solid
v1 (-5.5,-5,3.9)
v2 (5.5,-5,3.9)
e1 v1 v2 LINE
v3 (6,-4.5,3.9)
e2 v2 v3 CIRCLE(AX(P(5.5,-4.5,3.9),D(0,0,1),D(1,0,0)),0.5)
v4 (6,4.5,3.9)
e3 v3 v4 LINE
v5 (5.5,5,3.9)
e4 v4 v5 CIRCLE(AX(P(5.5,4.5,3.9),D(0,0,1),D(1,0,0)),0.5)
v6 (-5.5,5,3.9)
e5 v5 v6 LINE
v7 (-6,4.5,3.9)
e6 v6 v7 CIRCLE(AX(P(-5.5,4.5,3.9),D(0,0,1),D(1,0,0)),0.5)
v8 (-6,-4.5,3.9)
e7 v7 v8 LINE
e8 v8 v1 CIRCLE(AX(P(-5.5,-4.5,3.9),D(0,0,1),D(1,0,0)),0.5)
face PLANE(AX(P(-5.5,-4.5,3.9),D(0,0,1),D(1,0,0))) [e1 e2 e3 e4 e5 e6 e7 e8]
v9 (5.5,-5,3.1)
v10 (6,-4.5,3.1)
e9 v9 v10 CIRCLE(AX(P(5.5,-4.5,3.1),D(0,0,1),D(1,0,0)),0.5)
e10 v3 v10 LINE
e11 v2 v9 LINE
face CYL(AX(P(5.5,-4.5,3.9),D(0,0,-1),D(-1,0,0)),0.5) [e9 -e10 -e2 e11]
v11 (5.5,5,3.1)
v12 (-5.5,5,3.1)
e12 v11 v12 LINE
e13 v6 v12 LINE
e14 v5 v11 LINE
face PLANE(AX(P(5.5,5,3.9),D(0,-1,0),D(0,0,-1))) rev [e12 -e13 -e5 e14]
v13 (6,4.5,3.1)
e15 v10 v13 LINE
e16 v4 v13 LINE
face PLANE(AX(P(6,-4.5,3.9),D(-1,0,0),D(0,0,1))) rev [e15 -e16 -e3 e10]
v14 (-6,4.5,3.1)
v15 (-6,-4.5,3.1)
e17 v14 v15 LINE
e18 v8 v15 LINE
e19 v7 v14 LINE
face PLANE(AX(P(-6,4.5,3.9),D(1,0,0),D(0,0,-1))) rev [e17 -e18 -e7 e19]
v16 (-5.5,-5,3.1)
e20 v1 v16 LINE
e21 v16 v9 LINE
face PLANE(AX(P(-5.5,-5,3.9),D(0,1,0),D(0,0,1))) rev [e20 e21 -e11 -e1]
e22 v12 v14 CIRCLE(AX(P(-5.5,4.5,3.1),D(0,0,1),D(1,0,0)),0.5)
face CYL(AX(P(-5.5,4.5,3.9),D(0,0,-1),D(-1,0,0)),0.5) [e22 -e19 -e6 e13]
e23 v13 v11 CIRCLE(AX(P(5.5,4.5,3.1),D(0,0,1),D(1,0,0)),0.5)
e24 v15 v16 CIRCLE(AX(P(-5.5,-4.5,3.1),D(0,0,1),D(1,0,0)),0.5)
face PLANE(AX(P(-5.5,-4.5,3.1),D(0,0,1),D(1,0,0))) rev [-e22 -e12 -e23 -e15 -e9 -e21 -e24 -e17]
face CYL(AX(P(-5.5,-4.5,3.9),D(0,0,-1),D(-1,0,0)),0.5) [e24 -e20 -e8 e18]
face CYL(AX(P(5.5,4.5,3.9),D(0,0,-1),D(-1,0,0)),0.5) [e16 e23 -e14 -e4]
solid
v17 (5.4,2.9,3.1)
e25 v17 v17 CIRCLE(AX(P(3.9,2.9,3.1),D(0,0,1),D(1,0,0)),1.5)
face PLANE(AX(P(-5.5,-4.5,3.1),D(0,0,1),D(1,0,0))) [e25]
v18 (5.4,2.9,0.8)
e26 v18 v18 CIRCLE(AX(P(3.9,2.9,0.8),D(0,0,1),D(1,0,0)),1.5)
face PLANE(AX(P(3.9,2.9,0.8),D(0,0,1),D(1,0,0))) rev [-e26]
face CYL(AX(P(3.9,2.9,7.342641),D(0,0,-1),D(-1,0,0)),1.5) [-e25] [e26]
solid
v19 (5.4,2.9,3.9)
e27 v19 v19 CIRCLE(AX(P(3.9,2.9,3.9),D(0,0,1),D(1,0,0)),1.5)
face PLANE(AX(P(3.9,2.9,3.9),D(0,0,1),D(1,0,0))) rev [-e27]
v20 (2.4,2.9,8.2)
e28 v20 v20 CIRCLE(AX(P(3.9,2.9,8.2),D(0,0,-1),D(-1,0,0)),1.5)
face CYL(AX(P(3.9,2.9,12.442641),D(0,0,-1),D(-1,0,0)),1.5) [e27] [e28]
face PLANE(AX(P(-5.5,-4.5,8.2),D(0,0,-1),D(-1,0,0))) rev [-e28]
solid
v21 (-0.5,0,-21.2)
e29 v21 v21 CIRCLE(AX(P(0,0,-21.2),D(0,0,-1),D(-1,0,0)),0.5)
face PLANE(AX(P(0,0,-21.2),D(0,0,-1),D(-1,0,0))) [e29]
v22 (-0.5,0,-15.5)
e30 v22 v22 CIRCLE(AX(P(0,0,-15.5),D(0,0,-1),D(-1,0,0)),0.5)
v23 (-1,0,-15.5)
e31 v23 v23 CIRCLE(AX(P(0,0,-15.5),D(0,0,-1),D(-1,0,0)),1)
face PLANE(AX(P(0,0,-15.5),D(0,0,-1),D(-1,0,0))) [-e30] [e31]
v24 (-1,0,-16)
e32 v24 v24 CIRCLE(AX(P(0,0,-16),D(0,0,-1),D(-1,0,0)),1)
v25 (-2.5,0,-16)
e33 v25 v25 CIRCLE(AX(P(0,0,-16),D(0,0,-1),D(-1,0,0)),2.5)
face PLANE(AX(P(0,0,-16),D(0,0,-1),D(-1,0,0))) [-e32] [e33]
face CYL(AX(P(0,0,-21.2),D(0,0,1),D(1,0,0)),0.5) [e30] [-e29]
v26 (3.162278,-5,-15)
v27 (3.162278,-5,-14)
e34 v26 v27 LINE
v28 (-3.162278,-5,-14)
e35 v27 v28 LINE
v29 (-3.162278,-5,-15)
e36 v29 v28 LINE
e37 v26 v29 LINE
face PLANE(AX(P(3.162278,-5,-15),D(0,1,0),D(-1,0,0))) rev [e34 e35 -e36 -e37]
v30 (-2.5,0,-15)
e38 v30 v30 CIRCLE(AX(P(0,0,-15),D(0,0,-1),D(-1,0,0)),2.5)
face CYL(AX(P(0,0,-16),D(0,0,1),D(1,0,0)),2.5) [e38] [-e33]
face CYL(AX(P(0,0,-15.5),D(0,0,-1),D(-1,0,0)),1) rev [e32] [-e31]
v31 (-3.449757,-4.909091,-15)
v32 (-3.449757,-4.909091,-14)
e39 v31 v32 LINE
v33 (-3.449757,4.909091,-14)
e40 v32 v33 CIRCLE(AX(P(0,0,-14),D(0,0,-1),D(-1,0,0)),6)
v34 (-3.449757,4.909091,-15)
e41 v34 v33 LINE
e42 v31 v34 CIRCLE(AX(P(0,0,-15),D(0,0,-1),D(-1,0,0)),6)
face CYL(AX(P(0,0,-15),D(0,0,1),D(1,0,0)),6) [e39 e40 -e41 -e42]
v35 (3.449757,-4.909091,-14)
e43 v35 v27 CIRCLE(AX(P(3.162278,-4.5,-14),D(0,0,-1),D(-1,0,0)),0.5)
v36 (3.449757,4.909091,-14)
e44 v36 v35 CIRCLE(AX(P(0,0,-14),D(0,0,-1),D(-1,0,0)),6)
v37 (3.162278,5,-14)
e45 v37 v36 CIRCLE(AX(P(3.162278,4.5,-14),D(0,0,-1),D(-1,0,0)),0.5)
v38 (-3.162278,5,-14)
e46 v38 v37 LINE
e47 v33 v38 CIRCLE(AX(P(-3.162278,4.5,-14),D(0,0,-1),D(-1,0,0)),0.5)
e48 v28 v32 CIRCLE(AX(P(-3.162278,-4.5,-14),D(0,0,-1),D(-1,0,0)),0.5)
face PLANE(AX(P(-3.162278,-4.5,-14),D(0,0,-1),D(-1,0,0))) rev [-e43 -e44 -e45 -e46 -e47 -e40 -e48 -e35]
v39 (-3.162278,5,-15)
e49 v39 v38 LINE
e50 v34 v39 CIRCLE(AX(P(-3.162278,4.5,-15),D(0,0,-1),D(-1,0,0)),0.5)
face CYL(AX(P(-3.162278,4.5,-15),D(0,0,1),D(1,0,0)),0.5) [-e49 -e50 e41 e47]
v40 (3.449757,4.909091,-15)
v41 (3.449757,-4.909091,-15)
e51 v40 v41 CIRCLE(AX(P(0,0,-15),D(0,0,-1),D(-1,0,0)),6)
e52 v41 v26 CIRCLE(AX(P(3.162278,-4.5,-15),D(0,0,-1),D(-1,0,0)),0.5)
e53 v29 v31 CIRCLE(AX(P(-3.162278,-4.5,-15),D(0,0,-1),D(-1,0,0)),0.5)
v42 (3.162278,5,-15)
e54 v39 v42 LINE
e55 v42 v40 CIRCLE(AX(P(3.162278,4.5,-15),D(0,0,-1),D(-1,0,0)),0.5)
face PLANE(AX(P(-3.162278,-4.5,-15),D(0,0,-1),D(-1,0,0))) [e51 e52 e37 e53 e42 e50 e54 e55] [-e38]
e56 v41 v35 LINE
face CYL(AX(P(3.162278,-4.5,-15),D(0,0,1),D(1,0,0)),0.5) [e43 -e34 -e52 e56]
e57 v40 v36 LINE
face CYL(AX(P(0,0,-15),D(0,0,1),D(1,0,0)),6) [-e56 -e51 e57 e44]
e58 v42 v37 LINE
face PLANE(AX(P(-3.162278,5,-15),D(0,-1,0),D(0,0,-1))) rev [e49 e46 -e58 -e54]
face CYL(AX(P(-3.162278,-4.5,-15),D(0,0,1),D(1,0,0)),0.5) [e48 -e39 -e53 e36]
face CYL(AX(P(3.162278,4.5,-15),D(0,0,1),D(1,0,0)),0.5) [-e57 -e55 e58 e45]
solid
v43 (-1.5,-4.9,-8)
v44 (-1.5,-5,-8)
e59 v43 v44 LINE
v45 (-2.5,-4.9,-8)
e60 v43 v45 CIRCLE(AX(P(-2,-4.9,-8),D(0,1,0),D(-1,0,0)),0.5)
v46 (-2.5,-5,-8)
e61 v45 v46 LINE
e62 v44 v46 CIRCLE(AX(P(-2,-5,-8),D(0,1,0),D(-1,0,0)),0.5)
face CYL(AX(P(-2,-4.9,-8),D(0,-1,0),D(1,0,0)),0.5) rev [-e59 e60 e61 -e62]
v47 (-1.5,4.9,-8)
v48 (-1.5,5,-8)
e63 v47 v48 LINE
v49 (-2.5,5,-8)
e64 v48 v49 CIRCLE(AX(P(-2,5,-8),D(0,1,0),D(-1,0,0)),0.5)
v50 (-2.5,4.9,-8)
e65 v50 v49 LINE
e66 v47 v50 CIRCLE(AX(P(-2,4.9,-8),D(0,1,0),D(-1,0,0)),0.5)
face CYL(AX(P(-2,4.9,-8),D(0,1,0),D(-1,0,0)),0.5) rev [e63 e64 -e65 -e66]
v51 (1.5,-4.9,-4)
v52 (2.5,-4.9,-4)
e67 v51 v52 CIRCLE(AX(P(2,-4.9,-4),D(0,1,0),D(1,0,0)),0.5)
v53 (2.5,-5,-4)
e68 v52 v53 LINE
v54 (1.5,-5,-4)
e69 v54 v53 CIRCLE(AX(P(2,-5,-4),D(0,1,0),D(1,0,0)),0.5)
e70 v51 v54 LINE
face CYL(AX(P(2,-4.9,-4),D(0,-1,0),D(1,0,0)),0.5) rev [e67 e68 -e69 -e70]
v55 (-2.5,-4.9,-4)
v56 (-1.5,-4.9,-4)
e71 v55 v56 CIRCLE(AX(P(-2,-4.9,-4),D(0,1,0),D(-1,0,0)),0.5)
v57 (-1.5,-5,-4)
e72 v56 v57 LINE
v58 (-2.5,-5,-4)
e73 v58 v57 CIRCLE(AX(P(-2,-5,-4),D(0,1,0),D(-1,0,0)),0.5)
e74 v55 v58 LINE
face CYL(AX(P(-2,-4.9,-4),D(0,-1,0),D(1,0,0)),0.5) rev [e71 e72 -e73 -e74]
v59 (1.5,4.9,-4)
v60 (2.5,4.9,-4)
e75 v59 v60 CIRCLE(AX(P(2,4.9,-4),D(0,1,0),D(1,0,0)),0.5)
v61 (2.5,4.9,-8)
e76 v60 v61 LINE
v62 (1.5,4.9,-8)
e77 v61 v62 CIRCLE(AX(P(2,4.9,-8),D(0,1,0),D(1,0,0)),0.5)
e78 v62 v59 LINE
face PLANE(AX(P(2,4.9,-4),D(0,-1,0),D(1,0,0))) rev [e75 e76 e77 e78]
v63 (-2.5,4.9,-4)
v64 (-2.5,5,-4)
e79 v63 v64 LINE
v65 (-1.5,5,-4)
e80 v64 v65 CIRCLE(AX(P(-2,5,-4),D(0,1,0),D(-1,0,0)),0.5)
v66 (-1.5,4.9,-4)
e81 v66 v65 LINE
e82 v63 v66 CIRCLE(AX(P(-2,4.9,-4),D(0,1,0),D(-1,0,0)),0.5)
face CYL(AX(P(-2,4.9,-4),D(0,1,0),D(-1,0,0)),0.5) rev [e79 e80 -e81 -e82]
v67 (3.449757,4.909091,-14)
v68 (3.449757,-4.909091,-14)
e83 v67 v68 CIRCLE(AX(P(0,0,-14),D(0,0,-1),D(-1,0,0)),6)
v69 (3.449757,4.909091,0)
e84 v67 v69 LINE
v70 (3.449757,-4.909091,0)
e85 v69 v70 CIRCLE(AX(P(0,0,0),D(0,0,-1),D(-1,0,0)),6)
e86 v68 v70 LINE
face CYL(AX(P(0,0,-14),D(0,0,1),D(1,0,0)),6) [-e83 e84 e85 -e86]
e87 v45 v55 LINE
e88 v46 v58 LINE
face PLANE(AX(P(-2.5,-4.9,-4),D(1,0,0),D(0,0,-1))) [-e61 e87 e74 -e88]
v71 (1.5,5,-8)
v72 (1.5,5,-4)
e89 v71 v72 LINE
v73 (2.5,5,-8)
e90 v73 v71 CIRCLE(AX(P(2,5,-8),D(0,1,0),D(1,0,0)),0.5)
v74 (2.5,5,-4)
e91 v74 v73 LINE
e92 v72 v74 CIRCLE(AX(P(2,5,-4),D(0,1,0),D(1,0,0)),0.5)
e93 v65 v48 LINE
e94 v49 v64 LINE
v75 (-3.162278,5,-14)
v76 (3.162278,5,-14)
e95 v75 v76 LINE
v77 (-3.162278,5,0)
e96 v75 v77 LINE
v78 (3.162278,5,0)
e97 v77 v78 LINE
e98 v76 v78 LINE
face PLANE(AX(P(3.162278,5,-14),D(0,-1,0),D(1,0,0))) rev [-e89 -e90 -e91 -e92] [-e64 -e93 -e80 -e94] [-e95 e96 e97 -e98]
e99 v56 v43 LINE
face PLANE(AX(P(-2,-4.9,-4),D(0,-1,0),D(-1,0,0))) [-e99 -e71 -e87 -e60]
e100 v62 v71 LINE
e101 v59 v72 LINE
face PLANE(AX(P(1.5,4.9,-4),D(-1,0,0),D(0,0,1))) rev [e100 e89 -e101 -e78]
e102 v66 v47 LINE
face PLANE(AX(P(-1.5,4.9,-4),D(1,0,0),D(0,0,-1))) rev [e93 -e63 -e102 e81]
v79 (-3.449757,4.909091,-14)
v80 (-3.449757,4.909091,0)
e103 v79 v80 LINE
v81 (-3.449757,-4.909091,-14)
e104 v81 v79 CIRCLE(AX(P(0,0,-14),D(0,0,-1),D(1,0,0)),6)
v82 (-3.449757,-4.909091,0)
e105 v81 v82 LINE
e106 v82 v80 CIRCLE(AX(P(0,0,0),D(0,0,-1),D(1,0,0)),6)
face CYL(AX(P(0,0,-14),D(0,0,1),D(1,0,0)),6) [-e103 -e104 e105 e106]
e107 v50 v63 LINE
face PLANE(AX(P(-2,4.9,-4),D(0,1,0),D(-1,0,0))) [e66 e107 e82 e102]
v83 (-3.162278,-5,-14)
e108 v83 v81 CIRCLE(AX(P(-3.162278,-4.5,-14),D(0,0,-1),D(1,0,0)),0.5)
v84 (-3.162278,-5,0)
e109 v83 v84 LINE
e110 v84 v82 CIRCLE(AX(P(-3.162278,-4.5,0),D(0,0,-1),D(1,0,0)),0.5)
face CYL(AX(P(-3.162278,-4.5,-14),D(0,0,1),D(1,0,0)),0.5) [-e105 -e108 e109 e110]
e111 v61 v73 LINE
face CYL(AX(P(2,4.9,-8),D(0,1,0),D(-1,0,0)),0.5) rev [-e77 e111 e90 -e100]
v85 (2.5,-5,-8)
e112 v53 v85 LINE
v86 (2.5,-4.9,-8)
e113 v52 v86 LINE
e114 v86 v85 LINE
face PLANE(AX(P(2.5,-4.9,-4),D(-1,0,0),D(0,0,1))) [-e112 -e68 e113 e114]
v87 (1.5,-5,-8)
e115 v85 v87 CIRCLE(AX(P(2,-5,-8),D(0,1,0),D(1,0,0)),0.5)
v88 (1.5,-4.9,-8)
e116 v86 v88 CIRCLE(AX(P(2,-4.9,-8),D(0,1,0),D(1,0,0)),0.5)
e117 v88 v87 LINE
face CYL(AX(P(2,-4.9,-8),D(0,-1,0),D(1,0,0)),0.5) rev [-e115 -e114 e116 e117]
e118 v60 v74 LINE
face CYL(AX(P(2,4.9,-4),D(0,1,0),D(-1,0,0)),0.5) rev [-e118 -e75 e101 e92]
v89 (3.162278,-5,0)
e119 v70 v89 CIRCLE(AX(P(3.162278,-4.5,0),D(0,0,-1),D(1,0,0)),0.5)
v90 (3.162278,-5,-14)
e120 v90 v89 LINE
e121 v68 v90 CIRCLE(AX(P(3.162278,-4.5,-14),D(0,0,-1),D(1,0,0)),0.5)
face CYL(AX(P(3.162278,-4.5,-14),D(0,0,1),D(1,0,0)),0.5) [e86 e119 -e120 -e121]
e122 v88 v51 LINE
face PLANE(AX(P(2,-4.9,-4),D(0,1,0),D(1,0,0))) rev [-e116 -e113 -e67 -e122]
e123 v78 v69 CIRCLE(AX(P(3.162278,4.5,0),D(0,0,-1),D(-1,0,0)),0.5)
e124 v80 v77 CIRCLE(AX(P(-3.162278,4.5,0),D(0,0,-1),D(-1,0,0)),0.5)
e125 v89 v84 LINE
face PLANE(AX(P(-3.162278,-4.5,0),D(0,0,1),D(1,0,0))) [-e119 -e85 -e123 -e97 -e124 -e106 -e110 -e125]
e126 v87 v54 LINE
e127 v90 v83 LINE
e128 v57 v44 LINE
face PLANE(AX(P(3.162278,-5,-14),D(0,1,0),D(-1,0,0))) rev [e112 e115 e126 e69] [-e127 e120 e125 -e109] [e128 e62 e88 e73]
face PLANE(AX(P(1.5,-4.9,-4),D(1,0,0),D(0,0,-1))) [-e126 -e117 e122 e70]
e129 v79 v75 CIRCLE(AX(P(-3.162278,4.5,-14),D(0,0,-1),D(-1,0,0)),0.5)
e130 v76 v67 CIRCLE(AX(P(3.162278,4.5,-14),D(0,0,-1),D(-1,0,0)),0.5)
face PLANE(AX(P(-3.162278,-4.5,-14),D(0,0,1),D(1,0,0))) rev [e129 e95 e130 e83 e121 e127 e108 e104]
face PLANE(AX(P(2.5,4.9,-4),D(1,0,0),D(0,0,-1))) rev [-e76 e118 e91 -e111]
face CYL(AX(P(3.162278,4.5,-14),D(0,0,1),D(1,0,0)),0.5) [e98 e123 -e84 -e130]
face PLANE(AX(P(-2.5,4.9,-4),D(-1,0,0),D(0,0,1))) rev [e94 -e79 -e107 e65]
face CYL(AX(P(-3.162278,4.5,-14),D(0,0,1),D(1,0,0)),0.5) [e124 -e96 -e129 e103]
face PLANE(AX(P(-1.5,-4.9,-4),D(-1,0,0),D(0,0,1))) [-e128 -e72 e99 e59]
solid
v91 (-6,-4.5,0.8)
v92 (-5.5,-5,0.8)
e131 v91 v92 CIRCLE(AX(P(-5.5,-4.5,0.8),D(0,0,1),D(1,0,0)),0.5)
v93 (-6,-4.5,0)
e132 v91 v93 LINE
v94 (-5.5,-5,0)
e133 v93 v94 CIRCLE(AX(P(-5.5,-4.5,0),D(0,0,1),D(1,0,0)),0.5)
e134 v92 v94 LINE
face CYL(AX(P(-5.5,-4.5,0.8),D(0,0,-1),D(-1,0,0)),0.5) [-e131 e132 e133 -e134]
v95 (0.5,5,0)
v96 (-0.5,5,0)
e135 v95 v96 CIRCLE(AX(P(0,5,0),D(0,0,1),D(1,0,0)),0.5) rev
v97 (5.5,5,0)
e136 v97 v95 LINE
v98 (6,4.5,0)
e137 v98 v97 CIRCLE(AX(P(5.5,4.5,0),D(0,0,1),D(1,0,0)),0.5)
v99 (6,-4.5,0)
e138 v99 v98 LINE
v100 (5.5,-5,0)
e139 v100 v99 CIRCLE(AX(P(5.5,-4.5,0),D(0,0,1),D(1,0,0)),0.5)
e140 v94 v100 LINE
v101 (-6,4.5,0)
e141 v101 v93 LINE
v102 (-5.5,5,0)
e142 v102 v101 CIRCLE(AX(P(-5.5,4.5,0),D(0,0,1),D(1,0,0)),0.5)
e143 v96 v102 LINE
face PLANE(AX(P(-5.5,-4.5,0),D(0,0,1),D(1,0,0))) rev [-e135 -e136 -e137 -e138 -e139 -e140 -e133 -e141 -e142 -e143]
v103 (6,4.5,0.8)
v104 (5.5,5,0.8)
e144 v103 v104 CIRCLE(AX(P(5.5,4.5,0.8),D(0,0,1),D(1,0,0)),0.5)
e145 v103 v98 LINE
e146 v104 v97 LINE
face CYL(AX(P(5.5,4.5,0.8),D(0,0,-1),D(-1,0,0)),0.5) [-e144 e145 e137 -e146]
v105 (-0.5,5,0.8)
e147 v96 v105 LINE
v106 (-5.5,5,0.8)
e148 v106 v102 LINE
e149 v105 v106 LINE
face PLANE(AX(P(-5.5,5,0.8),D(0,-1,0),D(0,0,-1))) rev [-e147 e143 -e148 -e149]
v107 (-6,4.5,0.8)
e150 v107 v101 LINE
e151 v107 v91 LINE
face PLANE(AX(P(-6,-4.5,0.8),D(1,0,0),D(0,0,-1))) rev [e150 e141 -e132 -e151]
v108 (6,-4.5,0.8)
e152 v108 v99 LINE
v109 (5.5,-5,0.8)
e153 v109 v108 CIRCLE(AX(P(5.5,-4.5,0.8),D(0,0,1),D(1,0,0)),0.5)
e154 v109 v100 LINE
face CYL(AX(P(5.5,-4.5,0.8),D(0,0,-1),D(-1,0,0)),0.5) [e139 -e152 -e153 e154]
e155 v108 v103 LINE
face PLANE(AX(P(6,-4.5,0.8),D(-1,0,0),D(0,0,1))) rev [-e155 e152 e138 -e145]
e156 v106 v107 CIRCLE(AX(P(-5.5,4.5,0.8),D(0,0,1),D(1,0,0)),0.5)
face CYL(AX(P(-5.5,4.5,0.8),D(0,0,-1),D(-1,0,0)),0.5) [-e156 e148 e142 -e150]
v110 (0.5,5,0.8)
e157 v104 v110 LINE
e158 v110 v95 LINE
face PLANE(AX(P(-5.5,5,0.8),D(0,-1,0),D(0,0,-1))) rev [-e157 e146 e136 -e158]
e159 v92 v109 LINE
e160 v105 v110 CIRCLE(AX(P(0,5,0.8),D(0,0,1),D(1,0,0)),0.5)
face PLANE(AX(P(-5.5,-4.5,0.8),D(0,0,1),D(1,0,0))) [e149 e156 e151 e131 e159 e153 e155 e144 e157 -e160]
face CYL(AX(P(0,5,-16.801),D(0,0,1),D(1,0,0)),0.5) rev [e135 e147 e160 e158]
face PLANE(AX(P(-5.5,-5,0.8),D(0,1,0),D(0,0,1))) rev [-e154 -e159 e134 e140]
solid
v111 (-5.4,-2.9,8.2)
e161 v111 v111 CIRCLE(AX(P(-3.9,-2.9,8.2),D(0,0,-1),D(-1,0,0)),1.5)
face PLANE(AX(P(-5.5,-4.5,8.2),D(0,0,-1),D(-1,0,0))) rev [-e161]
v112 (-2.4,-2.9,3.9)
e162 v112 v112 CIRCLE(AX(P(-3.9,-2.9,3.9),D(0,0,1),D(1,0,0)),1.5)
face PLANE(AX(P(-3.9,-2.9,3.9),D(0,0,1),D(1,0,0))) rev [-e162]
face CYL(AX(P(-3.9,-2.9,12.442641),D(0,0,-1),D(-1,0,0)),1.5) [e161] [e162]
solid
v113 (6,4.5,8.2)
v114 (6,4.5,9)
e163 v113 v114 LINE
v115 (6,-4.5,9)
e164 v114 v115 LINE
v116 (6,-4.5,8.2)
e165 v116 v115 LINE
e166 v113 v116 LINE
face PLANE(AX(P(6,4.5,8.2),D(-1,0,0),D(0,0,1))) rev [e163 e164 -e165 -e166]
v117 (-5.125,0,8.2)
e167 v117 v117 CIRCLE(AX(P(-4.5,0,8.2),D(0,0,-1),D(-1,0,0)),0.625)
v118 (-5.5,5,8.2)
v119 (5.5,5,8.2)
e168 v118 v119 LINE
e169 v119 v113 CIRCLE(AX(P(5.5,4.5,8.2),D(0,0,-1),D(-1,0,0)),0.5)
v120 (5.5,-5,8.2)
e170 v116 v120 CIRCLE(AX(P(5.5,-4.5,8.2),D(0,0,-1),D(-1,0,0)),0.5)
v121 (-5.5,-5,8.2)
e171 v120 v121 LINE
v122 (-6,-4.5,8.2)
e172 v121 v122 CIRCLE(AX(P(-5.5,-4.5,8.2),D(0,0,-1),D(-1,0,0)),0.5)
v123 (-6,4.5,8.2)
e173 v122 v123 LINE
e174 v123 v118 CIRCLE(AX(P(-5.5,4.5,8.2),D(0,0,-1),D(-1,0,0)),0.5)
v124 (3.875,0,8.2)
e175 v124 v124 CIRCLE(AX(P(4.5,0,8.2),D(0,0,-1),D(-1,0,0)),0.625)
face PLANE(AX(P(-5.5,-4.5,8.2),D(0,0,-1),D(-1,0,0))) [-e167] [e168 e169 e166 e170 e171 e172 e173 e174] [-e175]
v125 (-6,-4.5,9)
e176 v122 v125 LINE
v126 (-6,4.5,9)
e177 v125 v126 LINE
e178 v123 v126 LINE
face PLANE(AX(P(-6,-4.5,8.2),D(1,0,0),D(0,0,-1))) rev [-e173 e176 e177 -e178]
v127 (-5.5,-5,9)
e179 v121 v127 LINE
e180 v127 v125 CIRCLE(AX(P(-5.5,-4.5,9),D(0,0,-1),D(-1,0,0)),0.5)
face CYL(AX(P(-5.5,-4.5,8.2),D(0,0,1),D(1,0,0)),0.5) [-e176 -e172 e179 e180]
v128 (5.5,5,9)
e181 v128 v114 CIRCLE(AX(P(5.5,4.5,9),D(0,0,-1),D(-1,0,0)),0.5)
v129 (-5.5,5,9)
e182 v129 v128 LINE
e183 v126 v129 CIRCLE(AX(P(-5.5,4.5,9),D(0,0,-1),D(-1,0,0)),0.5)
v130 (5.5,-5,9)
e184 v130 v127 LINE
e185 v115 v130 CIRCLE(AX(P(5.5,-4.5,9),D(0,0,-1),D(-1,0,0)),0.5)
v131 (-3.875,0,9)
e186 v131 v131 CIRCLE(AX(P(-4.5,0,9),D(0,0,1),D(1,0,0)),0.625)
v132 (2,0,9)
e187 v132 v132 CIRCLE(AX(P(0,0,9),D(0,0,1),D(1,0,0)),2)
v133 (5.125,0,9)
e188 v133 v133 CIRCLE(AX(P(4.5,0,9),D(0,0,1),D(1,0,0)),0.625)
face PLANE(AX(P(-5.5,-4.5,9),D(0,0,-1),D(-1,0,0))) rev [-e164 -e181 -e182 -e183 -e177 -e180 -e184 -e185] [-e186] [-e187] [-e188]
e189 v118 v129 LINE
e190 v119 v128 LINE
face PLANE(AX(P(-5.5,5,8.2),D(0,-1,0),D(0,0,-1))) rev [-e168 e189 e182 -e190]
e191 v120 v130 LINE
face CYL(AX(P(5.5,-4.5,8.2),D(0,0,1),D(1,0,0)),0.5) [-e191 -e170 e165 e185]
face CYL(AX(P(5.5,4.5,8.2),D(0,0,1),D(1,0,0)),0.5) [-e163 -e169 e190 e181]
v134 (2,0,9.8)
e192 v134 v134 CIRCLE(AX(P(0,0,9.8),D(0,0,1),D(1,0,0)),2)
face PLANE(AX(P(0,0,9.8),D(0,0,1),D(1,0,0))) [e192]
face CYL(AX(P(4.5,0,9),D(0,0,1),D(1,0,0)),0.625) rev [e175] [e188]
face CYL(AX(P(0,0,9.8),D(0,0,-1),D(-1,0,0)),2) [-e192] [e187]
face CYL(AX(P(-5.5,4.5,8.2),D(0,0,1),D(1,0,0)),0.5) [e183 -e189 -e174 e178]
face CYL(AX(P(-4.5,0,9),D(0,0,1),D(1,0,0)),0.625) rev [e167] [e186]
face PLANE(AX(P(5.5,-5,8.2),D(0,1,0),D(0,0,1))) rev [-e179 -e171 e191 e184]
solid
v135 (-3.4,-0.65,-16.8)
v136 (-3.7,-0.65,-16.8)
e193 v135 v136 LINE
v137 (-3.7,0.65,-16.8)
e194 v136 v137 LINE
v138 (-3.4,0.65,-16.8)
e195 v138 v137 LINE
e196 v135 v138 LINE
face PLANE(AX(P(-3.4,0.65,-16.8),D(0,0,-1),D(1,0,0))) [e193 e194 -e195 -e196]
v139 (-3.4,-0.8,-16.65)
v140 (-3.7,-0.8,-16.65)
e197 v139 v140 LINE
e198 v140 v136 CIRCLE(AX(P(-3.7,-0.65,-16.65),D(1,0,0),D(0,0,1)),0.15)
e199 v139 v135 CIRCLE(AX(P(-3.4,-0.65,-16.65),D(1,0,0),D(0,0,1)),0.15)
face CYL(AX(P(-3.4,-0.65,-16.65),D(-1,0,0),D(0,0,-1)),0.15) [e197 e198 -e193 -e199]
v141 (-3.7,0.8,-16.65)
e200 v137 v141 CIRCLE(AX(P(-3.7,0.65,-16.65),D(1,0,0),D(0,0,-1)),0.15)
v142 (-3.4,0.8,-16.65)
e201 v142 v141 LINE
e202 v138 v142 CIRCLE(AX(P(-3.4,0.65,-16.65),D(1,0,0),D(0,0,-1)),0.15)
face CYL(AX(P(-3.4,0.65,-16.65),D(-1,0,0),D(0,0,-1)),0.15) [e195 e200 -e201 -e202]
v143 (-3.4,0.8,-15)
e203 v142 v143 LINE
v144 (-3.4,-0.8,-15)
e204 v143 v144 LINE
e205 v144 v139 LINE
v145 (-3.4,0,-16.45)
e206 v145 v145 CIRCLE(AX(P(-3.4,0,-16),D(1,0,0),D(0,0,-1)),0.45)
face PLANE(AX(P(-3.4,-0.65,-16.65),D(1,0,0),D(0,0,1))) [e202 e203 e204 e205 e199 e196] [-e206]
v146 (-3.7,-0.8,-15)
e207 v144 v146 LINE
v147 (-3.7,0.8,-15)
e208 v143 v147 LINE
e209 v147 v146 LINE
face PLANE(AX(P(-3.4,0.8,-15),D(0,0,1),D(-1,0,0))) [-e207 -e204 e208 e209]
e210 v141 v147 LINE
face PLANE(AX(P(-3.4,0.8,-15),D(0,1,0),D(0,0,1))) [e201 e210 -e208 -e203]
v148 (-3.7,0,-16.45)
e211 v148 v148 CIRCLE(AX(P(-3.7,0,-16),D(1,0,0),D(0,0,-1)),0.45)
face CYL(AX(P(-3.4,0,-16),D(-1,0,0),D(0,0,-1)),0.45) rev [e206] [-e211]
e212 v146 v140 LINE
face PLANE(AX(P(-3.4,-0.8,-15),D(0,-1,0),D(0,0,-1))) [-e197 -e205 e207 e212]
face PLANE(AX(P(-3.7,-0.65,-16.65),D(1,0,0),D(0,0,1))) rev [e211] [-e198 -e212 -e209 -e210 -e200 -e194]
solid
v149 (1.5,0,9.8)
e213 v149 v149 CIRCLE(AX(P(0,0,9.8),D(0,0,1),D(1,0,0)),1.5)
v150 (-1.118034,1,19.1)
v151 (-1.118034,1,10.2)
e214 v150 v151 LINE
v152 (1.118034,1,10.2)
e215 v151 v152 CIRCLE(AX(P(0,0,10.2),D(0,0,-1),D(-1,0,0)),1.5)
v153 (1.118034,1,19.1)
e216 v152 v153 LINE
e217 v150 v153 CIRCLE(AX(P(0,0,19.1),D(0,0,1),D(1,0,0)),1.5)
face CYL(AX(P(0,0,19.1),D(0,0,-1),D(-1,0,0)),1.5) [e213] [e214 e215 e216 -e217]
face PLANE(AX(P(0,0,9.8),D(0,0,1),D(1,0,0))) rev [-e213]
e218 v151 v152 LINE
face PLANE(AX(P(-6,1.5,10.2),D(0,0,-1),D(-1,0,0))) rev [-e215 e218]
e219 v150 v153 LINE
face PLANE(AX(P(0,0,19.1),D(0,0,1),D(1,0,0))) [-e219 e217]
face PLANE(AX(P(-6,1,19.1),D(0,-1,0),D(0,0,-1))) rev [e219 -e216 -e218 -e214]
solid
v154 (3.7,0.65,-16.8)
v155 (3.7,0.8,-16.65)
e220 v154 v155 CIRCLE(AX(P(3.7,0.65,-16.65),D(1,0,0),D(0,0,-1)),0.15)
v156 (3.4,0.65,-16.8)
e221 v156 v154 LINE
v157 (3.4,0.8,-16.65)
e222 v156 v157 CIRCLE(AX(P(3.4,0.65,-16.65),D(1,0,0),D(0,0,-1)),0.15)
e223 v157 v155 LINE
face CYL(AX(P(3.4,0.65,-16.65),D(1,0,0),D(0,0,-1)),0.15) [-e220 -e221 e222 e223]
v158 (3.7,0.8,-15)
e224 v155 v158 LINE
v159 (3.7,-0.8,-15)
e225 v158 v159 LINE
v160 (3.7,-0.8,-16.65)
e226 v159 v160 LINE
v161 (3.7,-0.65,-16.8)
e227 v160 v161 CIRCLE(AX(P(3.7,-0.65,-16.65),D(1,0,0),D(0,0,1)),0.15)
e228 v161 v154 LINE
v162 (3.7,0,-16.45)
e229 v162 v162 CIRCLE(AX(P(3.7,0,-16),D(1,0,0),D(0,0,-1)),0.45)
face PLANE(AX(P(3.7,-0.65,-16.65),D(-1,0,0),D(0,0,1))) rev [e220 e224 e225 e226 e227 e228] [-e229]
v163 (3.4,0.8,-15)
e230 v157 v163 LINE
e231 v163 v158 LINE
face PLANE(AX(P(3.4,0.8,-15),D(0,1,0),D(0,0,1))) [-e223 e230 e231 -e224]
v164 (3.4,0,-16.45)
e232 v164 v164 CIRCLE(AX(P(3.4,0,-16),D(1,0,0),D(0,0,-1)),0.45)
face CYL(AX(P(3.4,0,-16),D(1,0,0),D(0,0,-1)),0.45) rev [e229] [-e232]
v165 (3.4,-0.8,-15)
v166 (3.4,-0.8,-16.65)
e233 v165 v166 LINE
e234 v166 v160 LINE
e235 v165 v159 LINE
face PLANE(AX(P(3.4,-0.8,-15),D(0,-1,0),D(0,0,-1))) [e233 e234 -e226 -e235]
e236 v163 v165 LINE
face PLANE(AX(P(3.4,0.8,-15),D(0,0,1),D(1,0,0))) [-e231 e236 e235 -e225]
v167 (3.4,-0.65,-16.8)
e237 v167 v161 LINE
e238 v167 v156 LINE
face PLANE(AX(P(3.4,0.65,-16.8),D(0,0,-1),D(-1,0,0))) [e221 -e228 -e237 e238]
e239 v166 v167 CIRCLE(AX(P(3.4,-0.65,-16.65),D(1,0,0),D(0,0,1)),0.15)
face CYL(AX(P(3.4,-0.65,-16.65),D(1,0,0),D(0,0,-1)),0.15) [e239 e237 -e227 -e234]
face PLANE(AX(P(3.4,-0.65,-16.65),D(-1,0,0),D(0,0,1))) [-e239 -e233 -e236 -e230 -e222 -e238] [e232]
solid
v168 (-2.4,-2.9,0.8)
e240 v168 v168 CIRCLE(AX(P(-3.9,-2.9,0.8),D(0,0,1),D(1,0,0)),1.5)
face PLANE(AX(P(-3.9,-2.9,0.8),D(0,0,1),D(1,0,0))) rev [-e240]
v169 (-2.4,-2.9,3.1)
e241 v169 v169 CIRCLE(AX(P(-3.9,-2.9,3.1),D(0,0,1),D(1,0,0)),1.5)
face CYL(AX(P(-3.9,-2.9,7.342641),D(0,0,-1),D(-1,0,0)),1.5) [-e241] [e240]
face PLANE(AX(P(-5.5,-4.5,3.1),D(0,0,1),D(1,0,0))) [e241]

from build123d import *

# Parameters (mm, degrees)
BASE_FLANGE1_DEPTH           = 0.8
BOSS_EXTRUDE1_DEPTH          = 14
BOSS_EXTRUDE2_DEPTH          = 1
SKETCH8_R                    = 2.5
BOSS_EXTRUDE3_DEPTH          = 1
SKETCH9_R                    = 1
CUT_EXTRUDE1_DEPTH           = 0.5
SKETCH10_R                   = 0.45
BASE_FLANGE2_DEPTH           = 0.3
BASE_FLANGE3_START           = 0.8
BASE_FLANGE3_DEPTH           = 0.8
BASE_FLANGE4_DEPTH           = 0.8
SKETCH21_R                   = 1.5
BOSS_EXTRUDE4_DEPTH          = 2.3
BOSS_EXTRUDE4_2_DEPTH        = 2.3
SKETCH25_R                   = 1.5
BOSS_EXTRUDE5_DEPTH          = 4.3
BOSS_EXTRUDE5_2_DEPTH        = 4.3
SKETCH26_R                   = 2
BOSS_EXTRUDE6_DEPTH          = 0.8
SKETCH28_R                   = 1.5
BOSS_EXTRUDE7_DEPTH          = 9.3
CUT_EXTRUDE2_DEPTH           = 21.635164162
CUT_EXTRUDE2_DEPTH_BACK      = 21.635164162
SKETCH29_W                   = 8.9
SKETCH29_H                   = 0.5
M1_6_TAPPED_HOLE1_AT_2_COUNT = 2
M1_6_TAPPED_HOLE1_AT_2_PITCH = 9
SKETCH33_R                   = 0.5
CUT_EXTRUDE3_DEPTH           = 0.8
CUT_EXTRUDE4_DEPTH           = 0.1
SKETCH35_R                   = 0.5
BOSS_EXTRUDE8_DEPTH          = 5.7


# Sheet-metal steps are written as plain solids
with BuildPart() as part:
    # Sketch1 → Base-Flange1 (new body)
    with BuildSketch(Plane.XY):
        with BuildLine():
            Line((-5.5, -5), (5.5, -5))
            ThreePointArc((5.5, -5), (5.853553391, -4.853553391), (6, -4.5))
            Line((6, -4.5), (6, 4.5))
            ThreePointArc((6, 4.5), (5.853553391, 4.853553391), (5.5, 5))
            Line((5.5, 5), (-5.5, 5))
            ThreePointArc((-5.5, 5), (-5.853553391, 4.853553391), (-6, 4.5))
            Line((-6, 4.5), (-6, -4.5))
            ThreePointArc((-6, -4.5), (-5.853553391, -4.853553391), (-5.5, -5))
        make_face()
    extrude(amount=BASE_FLANGE1_DEPTH)

    # Sketch33 → Cut-Extrude3 (cut)
    with BuildSketch(Plane.XY.offset(0.8)):
        with Locations((0, 5)):
            Circle(SKETCH33_R)
    extrude(amount=-CUT_EXTRUDE3_DEPTH, mode=Mode.SUBTRACT)


with BuildPart() as body_2:
    # Sketch6 → Boss-Extrude1 (new body)
    with BuildSketch(Plane(origin=(0, 0, 0), x_dir=(-1, 0, 0), z_dir=(0, 0, -1))):
        with BuildLine():
            Line((-3.16227766, 5), (3.16227766, 5))
            ThreePointArc((3.16227766, 5), (3.313033332, 4.976731295), (3.449757447, 4.909090909))
            ThreePointArc((3.449757447, 4.909090909), (6, 0), (3.449757447, -4.909090909))
            ThreePointArc((3.449757447, -4.909090909), (3.313033332, -4.976731295), (3.16227766, -5))
            Line((3.16227766, -5), (-3.16227766, -5))
            ThreePointArc((-3.16227766, -5), (-3.313033332, -4.976731295), (-3.449757447, -4.909090909))
            ThreePointArc((-3.449757447, -4.909090909), (-6, 0), (-3.449757447, 4.909090909))
            ThreePointArc((-3.449757447, 4.909090909), (-3.313033332, 4.976731295), (-3.16227766, 5))
        make_face()
    extrude(amount=BOSS_EXTRUDE1_DEPTH)

    # Sketch34 → Cut-Extrude4 (cut)
    with BuildSketch(Plane(origin=(0, 5, 0), x_dir=(1, 0, 0), z_dir=(0, 1, 0))):
        with BuildLine():
            Line((-2.5, 4), (-2.5, 8))
            ThreePointArc((-2.5, 8), (-2, 8.5), (-1.5, 8))
            Line((-1.5, 8), (-1.5, 4))
            ThreePointArc((-1.5, 4), (-2, 3.5), (-2.5, 4))
        make_face()
        with BuildLine():
            Line((2.5, 4), (2.5, 8))
            ThreePointArc((2.5, 8), (2, 8.5), (1.5, 8))
            Line((1.5, 8), (1.5, 4))
            ThreePointArc((1.5, 4), (2, 3.5), (2.5, 4))
        make_face()
    cut_extrude4 = extrude(amount=-CUT_EXTRUDE4_DEPTH, mode=Mode.SUBTRACT)

    # Mirror2: Cut-Extrude4 across plane
    add(cut_extrude4.mirror(Plane.ZX), mode=Mode.SUBTRACT)


with BuildPart() as body_3:
    # Sketch7 → Boss-Extrude2 (new body)
    with BuildSketch(Plane(origin=(0, 0, -14), x_dir=(-1, 0, 0), z_dir=(0, 0, -1))):
        with BuildLine():
            Line((3.16227766, 5), (-3.16227766, 5))
            ThreePointArc((-3.16227766, 5), (-3.313033332, 4.976731295), (-3.449757447, 4.909090909))
            ThreePointArc((-3.449757447, 4.909090909), (-6, 0), (-3.449757447, -4.909090909))
            ThreePointArc((-3.449757447, -4.909090909), (-3.313033332, -4.976731295), (-3.16227766, -5))
            Line((-3.16227766, -5), (3.16227766, -5))
            ThreePointArc((3.16227766, -5), (3.313033332, -4.976731295), (3.449757447, -4.909090909))
            ThreePointArc((3.449757447, -4.909090909), (6, 0), (3.449757447, 4.909090909))
            ThreePointArc((3.449757447, 4.909090909), (3.313033332, 4.976731295), (3.16227766, 5))
        make_face()
    extrude(amount=BOSS_EXTRUDE2_DEPTH)

    # Sketch8 → Boss-Extrude3 (add)
    with BuildSketch(Plane(origin=(0, 0, -15), x_dir=(-1, 0, 0), z_dir=(0, 0, -1))):
        Circle(SKETCH8_R)
    extrude(amount=BOSS_EXTRUDE3_DEPTH)

    # Sketch9 → Cut-Extrude1 (cut)
    with BuildSketch(Plane(origin=(0, 0, -16), x_dir=(-1, 0, 0), z_dir=(0, 0, -1))):
        Circle(SKETCH9_R)
    extrude(amount=-CUT_EXTRUDE1_DEPTH, mode=Mode.SUBTRACT)

    # Sketch35 → Boss-Extrude8 (add)
    with BuildSketch(Plane(origin=(0, 0, -15.5), x_dir=(-1, 0, 0), z_dir=(0, 0, -1))):
        Circle(SKETCH35_R)
    extrude(amount=BOSS_EXTRUDE8_DEPTH)


with BuildPart() as body_4:
    # Sketch10 → Base-Flange2 (new body)
    with BuildSketch(Plane(origin=(3.7, 0, 0), x_dir=(0, 0, -1), z_dir=(1, 0, 0))):
        with BuildLine():
            Line((15, 0.8), (16.65, 0.8))
            ThreePointArc((16.65, 0.8), (16.756066017, 0.756066017), (16.8, 0.65))
            Line((16.8, 0.65), (16.8, -0.65))
            ThreePointArc((16.8, -0.65), (16.756066017, -0.756066017), (16.65, -0.8))
            Line((16.65, -0.8), (15, -0.8))
            Line((15, -0.8), (15, 0.8))
        make_face()
        with Locations((16, 0)):
            Circle(SKETCH10_R, mode=Mode.SUBTRACT)
    extrude(amount=-BASE_FLANGE2_DEPTH)


with BuildPart() as body_5:
    # Mirror1: mirrored copy
    add(body_4.part.mirror(Plane(origin=(0, 0, 0), x_dir=(0, 0, 1), z_dir=(1, 0, 0))))


with BuildPart() as body_6:
    # Sketch15 → Base-Flange3 (new body)
    with BuildSketch(Plane(origin=(0, 0, 9), x_dir=(-1, 0, 0), z_dir=(0, 0, -1)).offset(BASE_FLANGE3_START)):
        with BuildLine():
            Line((-5.5, -5), (5.5, -5))
            ThreePointArc((5.5, -5), (5.853553391, -4.853553391), (6, -4.5))
            Line((6, -4.5), (6, 4.5))
            ThreePointArc((6, 4.5), (5.853553391, 4.853553391), (5.5, 5))
            Line((5.5, 5), (-5.5, 5))
            ThreePointArc((-5.5, 5), (-5.853553391, 4.853553391), (-6, 4.5))
            Line((-6, 4.5), (-6, -4.5))
            ThreePointArc((-6, -4.5), (-5.853553391, -4.853553391), (-5.5, -5))
        make_face()
    extrude(amount=-BASE_FLANGE3_DEPTH)

    # Sketch26 → Boss-Extrude6 (add)
    with BuildSketch(Plane.XY.offset(9)):
        Circle(SKETCH26_R)
    extrude(amount=BOSS_EXTRUDE6_DEPTH)

    # Sketch32 → M1.6 Tapped Hole1 (revolve, cut)
    with BuildSketch(Plane(origin=(-4.5, 0, 9), x_dir=(0, -1, 0), z_dir=(1, 0, 0))):
        Polygon((0, 0), (0, 1.375537887), (0.625, 1), (0.625, 0), align=None)
    m1_6_tapped_hole1 = revolve(axis=Axis((-4.5, 0, 15.35), (0, 0, -1)), mode=Mode.SUBTRACT)

    # M1.6 Tapped Hole1 at 2: M1.6 Tapped Hole1 ×2
    with Locations(*[(i * M1_6_TAPPED_HOLE1_AT_2_PITCH, 0, 0) for i in range(1, M1_6_TAPPED_HOLE1_AT_2_COUNT)]):
        add(m1_6_tapped_hole1, mode=Mode.SUBTRACT)


with BuildPart() as body_7:
    # Sketch18 → Base-Flange4 (new body)
    with BuildSketch(Plane.XY.offset(3.1)):
        with BuildLine():
            Line((-5.5, -5), (5.5, -5))
            ThreePointArc((5.5, -5), (5.853553391, -4.853553391), (6, -4.5))
            Line((6, -4.5), (6, 4.5))
            ThreePointArc((6, 4.5), (5.853553391, 4.853553391), (5.5, 5))
            Line((5.5, 5), (-5.5, 5))
            ThreePointArc((-5.5, 5), (-5.853553391, 4.853553391), (-6, 4.5))
            Line((-6, 4.5), (-6, -4.5))
            ThreePointArc((-6, -4.5), (-5.853553391, -4.853553391), (-5.5, -5))
        make_face()
    extrude(amount=BASE_FLANGE4_DEPTH)


with BuildPart() as body_8:
    # Sketch21 → Boss-Extrude4 (new body)
    with BuildSketch(Plane.XY.offset(0.8)):
        with Locations((3.9, 2.9)):
            Circle(SKETCH21_R)
    extrude(amount=BOSS_EXTRUDE4_DEPTH)


with BuildPart() as body_9:
    # Sketch21 → Boss-Extrude4 2 (new body)
    with BuildSketch(Plane.XY.offset(0.8)):
        with Locations((-3.9, -2.9)):
            Circle(SKETCH21_R)
    extrude(amount=BOSS_EXTRUDE4_2_DEPTH)


with BuildPart() as body_10:
    # Sketch25 → Boss-Extrude5 (new body)
    with BuildSketch(Plane.XY.offset(3.9)):
        with Locations(Location((3.9, 2.9, 0), (0, 0, 180))):
            Circle(SKETCH25_R)
    extrude(amount=BOSS_EXTRUDE5_DEPTH)


with BuildPart() as body_11:
    # Sketch25 → Boss-Extrude5 2 (new body)
    with BuildSketch(Plane.XY.offset(3.9)):
        with Locations(Location((-3.9, -2.9, 0), (0, 0, 180))):
            Circle(SKETCH25_R)
    extrude(amount=BOSS_EXTRUDE5_2_DEPTH)


with BuildPart() as body_12:
    # Sketch28 → Boss-Extrude7 (new body)
    with BuildSketch(Plane.XY.offset(9.8)):
        Circle(SKETCH28_R)
    extrude(amount=BOSS_EXTRUDE7_DEPTH)

    # Sketch29 → Cut-Extrude2 (cut, two sides: drawn at the far end of the back side and taken through both)
    with BuildSketch(Plane(origin=(0, 0, 0), x_dir=(0, 0, -1), z_dir=(1, 0, 0)).offset(-CUT_EXTRUDE2_DEPTH_BACK)):
        with Locations((-14.65, 1.25)):
            Rectangle(SKETCH29_W, SKETCH29_H)
    extrude(amount=CUT_EXTRUDE2_DEPTH + CUT_EXTRUDE2_DEPTH_BACK, mode=Mode.SUBTRACT)


solid = Compound([part.part, body_2.part, body_3.part, body_4.part, body_5.part, body_6.part, body_7.part, body_8.part, body_9.part, body_10.part, body_11.part, body_12.part])
